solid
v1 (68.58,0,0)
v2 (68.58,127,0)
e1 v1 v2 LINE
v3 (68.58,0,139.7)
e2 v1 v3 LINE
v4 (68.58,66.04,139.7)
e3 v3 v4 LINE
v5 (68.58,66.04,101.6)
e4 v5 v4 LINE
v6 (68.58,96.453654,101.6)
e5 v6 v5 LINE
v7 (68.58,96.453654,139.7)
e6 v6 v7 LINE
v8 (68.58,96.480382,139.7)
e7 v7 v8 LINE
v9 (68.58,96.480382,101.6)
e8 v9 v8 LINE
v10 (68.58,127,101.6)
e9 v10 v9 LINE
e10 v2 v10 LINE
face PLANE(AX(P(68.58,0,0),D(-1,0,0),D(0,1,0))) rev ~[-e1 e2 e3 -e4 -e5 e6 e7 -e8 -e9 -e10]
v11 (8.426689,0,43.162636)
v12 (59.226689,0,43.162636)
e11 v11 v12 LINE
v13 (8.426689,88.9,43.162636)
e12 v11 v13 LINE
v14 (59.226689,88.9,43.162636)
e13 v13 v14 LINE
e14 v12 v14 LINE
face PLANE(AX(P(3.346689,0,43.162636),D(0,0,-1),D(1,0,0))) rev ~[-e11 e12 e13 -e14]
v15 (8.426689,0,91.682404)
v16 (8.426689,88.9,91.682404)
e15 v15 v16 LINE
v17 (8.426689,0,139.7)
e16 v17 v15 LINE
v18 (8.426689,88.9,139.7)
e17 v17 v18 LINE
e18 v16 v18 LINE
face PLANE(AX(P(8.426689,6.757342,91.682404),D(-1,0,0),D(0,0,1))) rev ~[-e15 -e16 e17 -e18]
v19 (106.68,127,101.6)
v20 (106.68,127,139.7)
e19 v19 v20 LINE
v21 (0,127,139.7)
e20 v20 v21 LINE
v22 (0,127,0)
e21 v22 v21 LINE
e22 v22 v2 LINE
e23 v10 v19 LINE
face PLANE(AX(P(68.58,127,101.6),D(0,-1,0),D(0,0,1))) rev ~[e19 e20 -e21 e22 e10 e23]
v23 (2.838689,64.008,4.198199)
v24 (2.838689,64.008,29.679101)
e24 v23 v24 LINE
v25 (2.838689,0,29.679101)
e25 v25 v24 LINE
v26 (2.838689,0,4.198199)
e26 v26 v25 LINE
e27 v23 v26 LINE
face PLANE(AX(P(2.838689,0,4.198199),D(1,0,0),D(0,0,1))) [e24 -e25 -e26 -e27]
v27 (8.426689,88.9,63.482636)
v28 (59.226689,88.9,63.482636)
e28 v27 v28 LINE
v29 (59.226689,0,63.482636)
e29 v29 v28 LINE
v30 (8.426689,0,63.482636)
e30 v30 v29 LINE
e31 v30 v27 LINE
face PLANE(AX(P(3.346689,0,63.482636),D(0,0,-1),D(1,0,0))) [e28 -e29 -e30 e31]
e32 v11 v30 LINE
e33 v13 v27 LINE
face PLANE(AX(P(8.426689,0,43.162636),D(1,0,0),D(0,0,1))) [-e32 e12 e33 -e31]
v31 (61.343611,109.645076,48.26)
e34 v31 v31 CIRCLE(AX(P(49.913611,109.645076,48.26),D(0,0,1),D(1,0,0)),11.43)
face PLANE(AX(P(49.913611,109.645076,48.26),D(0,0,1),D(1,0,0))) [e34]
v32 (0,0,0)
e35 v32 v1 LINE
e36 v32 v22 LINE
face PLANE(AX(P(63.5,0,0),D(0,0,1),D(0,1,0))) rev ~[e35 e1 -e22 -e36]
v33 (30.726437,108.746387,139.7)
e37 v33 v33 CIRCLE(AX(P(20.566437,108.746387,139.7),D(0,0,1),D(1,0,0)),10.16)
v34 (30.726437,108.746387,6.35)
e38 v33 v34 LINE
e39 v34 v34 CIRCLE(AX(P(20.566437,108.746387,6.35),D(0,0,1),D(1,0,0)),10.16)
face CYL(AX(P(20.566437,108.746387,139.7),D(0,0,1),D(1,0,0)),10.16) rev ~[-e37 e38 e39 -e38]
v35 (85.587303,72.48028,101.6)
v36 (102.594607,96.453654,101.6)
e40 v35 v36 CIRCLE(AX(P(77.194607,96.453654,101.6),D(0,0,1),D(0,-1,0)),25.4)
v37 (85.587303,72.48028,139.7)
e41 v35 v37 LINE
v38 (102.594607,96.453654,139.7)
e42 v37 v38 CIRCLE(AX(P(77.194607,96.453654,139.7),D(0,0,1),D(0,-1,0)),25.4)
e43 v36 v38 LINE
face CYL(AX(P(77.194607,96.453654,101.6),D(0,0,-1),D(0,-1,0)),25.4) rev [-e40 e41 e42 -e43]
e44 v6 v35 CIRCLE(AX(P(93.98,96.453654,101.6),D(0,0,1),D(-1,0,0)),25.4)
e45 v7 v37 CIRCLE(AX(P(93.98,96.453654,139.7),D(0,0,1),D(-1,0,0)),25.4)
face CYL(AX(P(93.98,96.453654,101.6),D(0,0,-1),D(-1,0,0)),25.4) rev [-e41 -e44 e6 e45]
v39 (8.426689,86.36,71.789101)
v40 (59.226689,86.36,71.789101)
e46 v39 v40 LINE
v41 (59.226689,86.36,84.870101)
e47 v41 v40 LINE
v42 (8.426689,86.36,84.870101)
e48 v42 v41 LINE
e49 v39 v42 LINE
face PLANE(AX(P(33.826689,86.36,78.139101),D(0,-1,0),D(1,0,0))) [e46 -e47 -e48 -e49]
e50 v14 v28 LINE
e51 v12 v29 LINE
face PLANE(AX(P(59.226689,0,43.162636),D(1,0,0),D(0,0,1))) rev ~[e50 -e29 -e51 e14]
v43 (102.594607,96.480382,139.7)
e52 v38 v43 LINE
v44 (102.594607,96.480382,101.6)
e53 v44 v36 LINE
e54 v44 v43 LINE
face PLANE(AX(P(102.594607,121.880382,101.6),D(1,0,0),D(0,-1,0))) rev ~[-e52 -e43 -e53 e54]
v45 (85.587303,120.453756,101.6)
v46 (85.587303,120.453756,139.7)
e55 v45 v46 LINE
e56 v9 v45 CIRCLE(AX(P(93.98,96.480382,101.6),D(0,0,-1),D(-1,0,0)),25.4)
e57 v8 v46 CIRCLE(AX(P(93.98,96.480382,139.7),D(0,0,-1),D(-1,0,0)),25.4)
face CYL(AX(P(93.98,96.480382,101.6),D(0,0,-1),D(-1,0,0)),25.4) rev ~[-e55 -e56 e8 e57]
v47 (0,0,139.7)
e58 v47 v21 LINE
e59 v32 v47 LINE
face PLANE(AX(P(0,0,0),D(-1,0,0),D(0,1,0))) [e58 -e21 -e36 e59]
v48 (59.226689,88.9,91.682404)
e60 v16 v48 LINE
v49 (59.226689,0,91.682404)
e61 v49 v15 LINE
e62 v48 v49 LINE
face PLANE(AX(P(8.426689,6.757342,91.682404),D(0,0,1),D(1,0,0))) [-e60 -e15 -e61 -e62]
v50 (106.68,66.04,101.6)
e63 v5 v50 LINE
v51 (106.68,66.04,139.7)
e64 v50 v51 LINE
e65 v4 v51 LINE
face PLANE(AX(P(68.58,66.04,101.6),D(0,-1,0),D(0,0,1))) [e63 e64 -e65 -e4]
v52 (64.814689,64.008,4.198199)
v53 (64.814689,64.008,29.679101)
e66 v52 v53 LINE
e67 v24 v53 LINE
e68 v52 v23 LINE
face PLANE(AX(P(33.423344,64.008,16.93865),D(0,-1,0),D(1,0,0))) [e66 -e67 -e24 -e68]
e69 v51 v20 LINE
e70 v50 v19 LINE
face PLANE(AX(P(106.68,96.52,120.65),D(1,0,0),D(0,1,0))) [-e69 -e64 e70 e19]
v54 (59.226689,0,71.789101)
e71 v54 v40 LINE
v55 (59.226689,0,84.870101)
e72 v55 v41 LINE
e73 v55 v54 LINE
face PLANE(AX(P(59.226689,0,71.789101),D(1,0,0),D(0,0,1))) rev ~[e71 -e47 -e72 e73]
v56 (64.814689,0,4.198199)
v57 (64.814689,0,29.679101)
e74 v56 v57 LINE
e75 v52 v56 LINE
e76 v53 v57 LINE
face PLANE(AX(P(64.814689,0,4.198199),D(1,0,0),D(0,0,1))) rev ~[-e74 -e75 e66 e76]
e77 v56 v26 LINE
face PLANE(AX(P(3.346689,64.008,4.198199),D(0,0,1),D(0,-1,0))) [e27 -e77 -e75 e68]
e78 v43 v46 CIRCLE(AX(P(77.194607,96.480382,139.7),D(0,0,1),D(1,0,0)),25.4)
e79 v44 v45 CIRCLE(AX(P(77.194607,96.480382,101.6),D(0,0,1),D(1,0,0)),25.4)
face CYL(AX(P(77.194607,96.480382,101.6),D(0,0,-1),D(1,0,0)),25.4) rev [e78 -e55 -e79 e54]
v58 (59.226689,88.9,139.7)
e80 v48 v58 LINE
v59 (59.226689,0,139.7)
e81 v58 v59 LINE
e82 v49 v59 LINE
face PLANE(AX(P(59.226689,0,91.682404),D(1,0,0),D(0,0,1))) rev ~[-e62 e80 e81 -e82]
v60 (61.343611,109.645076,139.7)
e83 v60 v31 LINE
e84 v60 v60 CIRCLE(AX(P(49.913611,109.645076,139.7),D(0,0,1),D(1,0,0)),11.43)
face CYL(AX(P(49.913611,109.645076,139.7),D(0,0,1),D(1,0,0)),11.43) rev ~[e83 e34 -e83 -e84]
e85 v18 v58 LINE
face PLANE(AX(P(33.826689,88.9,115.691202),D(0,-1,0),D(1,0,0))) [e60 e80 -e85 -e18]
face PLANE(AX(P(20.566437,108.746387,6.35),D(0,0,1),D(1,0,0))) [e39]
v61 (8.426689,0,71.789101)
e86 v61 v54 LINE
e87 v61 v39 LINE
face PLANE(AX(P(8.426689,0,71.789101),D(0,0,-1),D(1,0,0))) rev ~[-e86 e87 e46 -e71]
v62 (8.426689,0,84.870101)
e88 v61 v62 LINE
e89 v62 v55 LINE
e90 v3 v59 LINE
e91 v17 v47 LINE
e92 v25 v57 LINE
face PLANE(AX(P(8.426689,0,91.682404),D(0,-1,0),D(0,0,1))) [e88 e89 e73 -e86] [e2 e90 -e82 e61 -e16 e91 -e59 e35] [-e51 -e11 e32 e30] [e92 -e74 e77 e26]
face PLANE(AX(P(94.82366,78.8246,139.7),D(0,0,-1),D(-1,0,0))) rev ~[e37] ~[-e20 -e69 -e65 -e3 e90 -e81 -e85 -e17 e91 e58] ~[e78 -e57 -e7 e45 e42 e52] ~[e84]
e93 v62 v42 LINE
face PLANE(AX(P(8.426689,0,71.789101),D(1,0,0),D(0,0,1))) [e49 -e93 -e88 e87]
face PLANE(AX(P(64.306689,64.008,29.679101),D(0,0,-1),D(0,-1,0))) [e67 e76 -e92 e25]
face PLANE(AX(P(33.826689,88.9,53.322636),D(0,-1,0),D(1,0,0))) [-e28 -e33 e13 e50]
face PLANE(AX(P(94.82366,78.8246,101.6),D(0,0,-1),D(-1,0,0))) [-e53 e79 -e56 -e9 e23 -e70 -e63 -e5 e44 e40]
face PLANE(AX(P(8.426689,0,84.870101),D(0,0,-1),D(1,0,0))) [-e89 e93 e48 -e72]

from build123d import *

# Parameters (mm, degrees)
F0_W         = 76.2
F0_H         = 127
F1_DEPTH     = 139.7
F2_R         = 11.43
F3_DEPTH     = 91.44
F4_R         = 10.16
F5_DEPTH     = 133.35
F6_DEPTH     = 12.7
F8_DEPTH     = 5.08
F7_W         = 60.1533111874
F7_H         = 25.4809018224
F7_W_2       = 0.8066888126
F9_DEPTH     = 63.5
F10_DEPTH    = 91.44
F11_R        = 11.43
F12_DEPTH    = 91.44
F13_W        = 60.96
F13_H        = 20.32
F14_DEPTH    = 88.9
F15_DEPTH    = 5.08
F16_DEPTH    = 5.08
F17_W        = 50.8
F17_H        = 12.7
F18_DEPTH    = 86.36
F19_W        = 50.8
F19_H        = 48.0175957203
F20_DEPTH    = 88.9
F21_W        = 6.7573417909
F21_H        = 48.0175957203
F22_DEPTH    = 55.88
F23_W        = 60.96
F23_H        = 38.1
F24_DEPTH    = 38.1
F25_W        = 34.0146065784
F25_H        = 50.826728344
F26_DEPTH    = 50.8
F27_T1_DEPTH = 38.1
F28_DEPTH    = 0.508
F29_DEPTH    = 0.508
F30_DEPTH    = 0.508
F31_DEPTH    = 0.381
F32_DEPTH    = 25.4


# Not quite as in the source:
# - a fillet or chamfer that OpenCascade refuses, or shapes differently, is made with other operations: its cross-section is extruded or revolved along the edge and cut away or added


with BuildPart() as f1:
    # F0 (on Top) → F1 (new body)
    with BuildSketch(Plane.XY):
        with Locations((38.1, 63.5)):
            Rectangle(F0_W, F0_H)
    extrude(amount=F1_DEPTH)

    # F2 (on face) → F3 (cut)
    with BuildSketch(Plane.XY.offset(139.7)):
        with Locations((18.5702368617, 17.6018252969)):
            Circle(F2_R)
    extrude(amount=-F3_DEPTH, mode=Mode.SUBTRACT)

    # F4 (on face) → F5 (cut)
    with BuildSketch(Plane.XY.offset(139.7)):
        with Locations((20.5664373934, 108.7463870645)):
            Circle(F4_R)
    extrude(amount=-F5_DEPTH, mode=Mode.SUBTRACT)

    # F6 (cut): a face of the model
    f6_faces = [f1.faces().sort_by_distance(p)[0] for p in [
        (76.2, 63.5, 69.85),
    ]]
    extrude(f6_faces, amount=-F6_DEPTH, mode=Mode.SUBTRACT)

    # F8 (add): a face of the model
    f8_faces = [f1.faces().sort_by_distance(p)[0] for p in [
        (63.5, 63.5, 69.85),
    ]]
    extrude(f8_faces, amount=F8_DEPTH)

    # F7 (on face) → F9 (cut)
    with BuildSketch(Plane.XZ):
        with Locations((33.4233444063, 16.9386500493)):
            Rectangle(F7_W, F7_H)
        with Locations((63.9033444063, 16.9386500493)):
            Rectangle(F7_W_2, F7_H)
    extrude(amount=-F9_DEPTH, mode=Mode.SUBTRACT)

    # F10 (add): a face of the model
    f10_faces = [f1.faces().sort_by_distance(p)[0] for p in [
        (18.5702368617, 17.6018252969, 48.26),
    ]]
    extrude(f10_faces, amount=F10_DEPTH)

    # F11 (on face) → F12 (cut)
    with BuildSketch(Plane.XY.offset(139.7)):
        with Locations((49.913611263, 109.6450760961)):
            Circle(F11_R)
    extrude(amount=-F12_DEPTH, mode=Mode.SUBTRACT)

    # F13 (on face) → F14 (cut)
    with BuildSketch(Plane.XZ):
        with Locations((33.8266888126, 53.3226364589)):
            Rectangle(F13_W, F13_H)
    extrude(amount=-F14_DEPTH, mode=Mode.SUBTRACT)

    # F15 (add): a face of the model
    f15_faces = [f1.faces().sort_by_distance(p)[0] for p in [
        (3.3466888126, 44.45, 53.3226364589),
    ]]
    extrude(f15_faces, amount=F15_DEPTH)

    # F16 (add): a face of the model
    f16_faces = [f1.faces().sort_by_distance(p)[0] for p in [
        (64.3066888126, 44.45, 53.3226364589),
    ]]
    extrude(f16_faces, amount=F16_DEPTH)

    # F17 (on face) → F18 (cut)
    with BuildSketch(Plane.XZ):
        with Locations((33.8266888126, 78.1391007662)):
            Rectangle(F17_W, F17_H)
    extrude(amount=-F18_DEPTH, mode=Mode.SUBTRACT)

    # F19 (on face) → F20 (cut)
    with BuildSketch(Plane.XZ):
        with Locations((33.8266888126, 115.6912021399)):
            Rectangle(F19_W, F19_H)
    extrude(amount=-F20_DEPTH, mode=Mode.SUBTRACT)

    # F21 (on face) → F22 (join)
    with BuildSketch(Plane.YZ.offset(8.4266888126)):
        with Locations((3.3786708955, 115.6912021399)):
            Rectangle(F21_W, F21_H)
    extrude(amount=F22_DEPTH)

    # F23 (on face) → F24 (join)
    with BuildSketch(Plane.YZ.offset(68.58)):
        with Locations((96.52, 120.65)):
            Rectangle(F23_W, F23_H)
    extrude(amount=F24_DEPTH)

    # F25 (on face) → F26 (cut)
    with BuildSketch(Plane(origin=(0, 0, 101.6), x_dir=(1, 0, 0), z_dir=(0, 0, -1))):
        with Locations((85.5873032892, -96.4670181274)):
            Rectangle(F25_W, F25_H)
    extrude(amount=-F26_DEPTH, mode=Mode.SUBTRACT)

    # F27: fillet of radius 25.4 on 4 edges, made by hand

    # F27_s2 → F27_t1 (join)
    with BuildSketch(Plane.XY.offset(101.6)):
        with BuildLine():
            ThreePointArc((77.1946065784, 71.0536539555), (95.1551188205, 78.4931417133), (102.5946065784, 96.4536539555))
            Line((102.5946065784, 96.4536539555), (102.5946065784, 71.0536539555))
            Line((102.5946065784, 71.0536539555), (77.1946065784, 71.0536539555))
        make_face()
        with BuildLine():
            ThreePointArc((102.5946065784, 96.4803822994), (95.1551188205, 114.4408945416), (77.1946065784, 121.8803822994))
            Line((77.1946065784, 121.8803822994), (102.5946065784, 121.8803822994))
            Line((102.5946065784, 121.8803822994), (102.5946065784, 96.4803822994))
        make_face()
        with BuildLine():
            ThreePointArc((68.58, 96.4536539555), (76.0194877579, 78.4931417133), (93.98, 71.0536539555))
            Line((93.98, 71.0536539555), (68.58, 71.0536539555))
            Line((68.58, 71.0536539555), (68.58, 96.4536539555))
        make_face()
        with BuildLine():
            ThreePointArc((68.58, 96.4803822994), (76.0194877579, 114.4408945416), (93.98, 121.8803822994))
            Line((93.98, 121.8803822994), (68.58, 121.8803822994))
            Line((68.58, 121.8803822994), (68.58, 96.4803822994))
        make_face()
    extrude(amount=F27_T1_DEPTH)

    # F28 (cut): a face of the model
    f28_faces = [f1.faces().sort_by_distance(p)[0] for p in [
        (33.8266888126, 63.5, 16.9386500493),
    ]]
    extrude(f28_faces, amount=-F28_DEPTH, mode=Mode.SUBTRACT)

    # F29 (cut): a face of the model
    f29_faces = [f1.faces().sort_by_distance(p)[0] for p in [
        (3.3466888126, 32.004, 16.9386500493),
    ]]
    extrude(f29_faces, amount=-F29_DEPTH, mode=Mode.SUBTRACT)

    # F30 (cut): a face of the model
    f30_faces = [f1.faces().sort_by_distance(p)[0] for p in [
        (64.3066888126, 32.004, 16.9386500493),
    ]]
    extrude(f30_faces, amount=-F30_DEPTH, mode=Mode.SUBTRACT)

    # F31 (cut): a face of the model
    f31_faces = [f1.faces().sort_by_distance(p)[0] for p in [
        (33.8266888126, 43.18, 84.4891007662),
    ]]
    extrude(f31_faces, amount=-F31_DEPTH, mode=Mode.SUBTRACT)

    # F32 (cut): a face of the model
    f32_faces = [f1.faces().sort_by_distance(p)[0] for p in [
        (33.8266888126, 6.7573417909, 115.6912021399),
    ]]
    extrude(f32_faces, amount=-F32_DEPTH, mode=Mode.SUBTRACT)


solid = f1.part
